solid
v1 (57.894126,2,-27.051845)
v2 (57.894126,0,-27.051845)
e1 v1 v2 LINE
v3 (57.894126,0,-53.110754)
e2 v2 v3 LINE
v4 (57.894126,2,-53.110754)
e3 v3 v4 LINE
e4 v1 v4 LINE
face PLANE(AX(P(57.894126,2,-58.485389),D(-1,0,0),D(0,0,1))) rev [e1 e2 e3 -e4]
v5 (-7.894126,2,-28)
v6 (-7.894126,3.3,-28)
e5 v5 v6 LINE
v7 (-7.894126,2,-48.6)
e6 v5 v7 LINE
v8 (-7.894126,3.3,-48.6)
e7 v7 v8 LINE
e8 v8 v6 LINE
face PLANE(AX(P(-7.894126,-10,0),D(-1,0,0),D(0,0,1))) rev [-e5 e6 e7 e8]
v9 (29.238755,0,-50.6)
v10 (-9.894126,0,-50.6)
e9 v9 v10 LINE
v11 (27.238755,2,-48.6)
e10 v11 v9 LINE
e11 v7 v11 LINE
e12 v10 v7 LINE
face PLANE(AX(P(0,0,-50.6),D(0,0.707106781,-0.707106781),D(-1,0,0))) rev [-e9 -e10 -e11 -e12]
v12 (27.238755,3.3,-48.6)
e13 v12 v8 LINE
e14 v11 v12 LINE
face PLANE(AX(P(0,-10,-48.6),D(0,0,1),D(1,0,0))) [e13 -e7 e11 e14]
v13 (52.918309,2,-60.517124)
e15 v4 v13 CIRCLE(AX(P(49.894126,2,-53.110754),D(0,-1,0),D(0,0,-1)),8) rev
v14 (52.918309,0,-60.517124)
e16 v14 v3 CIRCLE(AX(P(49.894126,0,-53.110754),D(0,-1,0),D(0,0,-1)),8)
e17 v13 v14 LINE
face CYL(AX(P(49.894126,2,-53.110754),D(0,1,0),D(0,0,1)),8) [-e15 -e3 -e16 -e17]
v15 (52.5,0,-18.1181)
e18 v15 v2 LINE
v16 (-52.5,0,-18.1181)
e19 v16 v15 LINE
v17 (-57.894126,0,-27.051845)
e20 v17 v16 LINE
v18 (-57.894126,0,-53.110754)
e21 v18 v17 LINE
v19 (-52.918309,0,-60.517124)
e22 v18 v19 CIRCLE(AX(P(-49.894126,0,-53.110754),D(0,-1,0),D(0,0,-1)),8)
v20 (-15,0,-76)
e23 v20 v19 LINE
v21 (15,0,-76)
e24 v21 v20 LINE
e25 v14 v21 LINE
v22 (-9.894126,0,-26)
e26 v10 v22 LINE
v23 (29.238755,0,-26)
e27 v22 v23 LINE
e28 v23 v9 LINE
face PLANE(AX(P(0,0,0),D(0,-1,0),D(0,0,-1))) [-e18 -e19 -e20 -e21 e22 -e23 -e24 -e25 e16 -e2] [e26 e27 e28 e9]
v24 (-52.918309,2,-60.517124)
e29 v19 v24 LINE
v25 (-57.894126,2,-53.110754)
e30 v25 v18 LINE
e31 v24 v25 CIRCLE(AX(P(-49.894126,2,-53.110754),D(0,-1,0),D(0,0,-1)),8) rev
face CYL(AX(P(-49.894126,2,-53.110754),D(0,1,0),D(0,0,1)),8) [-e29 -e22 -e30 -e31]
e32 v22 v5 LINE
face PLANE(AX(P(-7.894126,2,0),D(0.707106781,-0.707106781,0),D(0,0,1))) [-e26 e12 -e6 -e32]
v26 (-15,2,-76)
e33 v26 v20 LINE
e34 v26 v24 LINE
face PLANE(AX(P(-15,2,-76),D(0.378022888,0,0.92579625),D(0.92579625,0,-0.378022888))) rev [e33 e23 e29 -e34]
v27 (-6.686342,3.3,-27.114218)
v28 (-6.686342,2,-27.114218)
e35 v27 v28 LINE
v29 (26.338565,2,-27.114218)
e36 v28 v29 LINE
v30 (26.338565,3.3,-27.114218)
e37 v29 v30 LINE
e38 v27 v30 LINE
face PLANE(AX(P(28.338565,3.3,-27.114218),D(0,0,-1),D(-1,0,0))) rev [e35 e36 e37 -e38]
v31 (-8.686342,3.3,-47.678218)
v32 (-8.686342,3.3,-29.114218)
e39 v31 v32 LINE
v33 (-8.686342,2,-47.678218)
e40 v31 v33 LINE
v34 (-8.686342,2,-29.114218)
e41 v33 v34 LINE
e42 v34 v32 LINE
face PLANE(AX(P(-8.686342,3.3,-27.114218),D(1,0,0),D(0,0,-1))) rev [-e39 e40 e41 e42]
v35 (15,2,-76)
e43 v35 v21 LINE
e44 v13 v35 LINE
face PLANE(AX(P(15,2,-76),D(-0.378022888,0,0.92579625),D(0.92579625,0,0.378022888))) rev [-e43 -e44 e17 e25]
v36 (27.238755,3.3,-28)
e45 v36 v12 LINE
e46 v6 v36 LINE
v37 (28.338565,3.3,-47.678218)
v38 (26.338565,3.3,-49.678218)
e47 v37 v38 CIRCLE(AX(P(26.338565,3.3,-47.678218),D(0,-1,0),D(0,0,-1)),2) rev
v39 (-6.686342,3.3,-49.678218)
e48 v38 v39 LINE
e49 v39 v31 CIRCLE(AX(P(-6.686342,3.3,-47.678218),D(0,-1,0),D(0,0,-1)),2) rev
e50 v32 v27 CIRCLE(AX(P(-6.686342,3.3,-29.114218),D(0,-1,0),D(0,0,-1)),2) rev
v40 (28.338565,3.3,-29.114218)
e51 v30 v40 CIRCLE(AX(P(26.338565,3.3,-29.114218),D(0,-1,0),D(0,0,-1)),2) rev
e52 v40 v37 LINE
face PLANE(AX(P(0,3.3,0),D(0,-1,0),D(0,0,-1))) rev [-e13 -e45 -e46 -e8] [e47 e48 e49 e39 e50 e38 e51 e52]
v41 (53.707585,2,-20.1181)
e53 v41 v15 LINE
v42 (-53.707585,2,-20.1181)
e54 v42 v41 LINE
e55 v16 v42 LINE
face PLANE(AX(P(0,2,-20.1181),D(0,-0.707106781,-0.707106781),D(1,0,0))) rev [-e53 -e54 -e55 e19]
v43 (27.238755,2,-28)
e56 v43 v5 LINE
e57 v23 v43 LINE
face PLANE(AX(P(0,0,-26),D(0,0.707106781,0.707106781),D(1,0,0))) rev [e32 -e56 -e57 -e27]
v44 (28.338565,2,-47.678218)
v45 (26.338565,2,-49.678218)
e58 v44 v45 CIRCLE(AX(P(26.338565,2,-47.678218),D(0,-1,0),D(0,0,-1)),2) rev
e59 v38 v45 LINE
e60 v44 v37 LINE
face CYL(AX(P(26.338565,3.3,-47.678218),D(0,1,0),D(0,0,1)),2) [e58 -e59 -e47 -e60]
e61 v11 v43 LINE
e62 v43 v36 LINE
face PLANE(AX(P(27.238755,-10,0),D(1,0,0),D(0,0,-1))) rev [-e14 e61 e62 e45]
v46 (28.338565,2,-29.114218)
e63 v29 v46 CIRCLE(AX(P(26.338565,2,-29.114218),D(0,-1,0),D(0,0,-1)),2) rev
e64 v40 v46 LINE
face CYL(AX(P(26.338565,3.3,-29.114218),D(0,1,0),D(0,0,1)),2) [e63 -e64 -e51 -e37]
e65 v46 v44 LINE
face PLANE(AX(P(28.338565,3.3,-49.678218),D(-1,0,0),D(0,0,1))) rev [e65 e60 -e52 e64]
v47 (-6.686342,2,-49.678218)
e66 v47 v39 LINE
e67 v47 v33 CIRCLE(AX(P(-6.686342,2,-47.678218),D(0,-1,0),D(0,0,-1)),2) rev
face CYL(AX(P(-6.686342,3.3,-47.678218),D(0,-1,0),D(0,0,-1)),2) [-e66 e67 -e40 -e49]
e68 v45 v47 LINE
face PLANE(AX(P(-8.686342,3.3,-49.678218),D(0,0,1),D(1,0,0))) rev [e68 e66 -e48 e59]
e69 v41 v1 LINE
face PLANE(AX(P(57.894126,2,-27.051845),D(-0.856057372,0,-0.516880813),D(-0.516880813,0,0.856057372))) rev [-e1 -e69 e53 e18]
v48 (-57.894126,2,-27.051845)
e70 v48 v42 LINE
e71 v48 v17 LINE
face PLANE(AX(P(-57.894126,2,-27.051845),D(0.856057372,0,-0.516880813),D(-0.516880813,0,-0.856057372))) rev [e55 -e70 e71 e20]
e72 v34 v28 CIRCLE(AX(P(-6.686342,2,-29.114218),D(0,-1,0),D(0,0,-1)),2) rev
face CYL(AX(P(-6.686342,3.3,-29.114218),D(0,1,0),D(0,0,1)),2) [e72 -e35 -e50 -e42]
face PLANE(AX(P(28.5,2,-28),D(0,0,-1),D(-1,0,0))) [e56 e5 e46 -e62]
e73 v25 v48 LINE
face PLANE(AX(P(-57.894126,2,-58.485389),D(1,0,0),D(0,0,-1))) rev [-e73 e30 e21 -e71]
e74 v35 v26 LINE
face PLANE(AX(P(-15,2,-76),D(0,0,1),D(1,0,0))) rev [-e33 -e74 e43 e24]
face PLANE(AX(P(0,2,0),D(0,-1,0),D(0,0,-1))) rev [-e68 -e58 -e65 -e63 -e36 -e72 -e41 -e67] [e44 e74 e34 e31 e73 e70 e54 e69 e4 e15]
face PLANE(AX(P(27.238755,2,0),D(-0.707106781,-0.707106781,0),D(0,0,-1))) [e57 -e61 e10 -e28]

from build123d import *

# Parameters (mm, degrees)
SKETCH2_W           = 33
SKETCH2_H           = 17.000000000000007
BOSS_EXTRUDE1_DEPTH = 2
FILLET1_R           = 8
FILLET2_R           = 8
CHAMFER1_SIZE       = 2
CUT_EXTRUDE2_DEPTH  = 12
SKETCH6_W           = 1.2612446076729746
SKETCH6_H           = 17.000000000000007
BOSS_EXTRUDE3_DEPTH = 2
SKETCH8_W           = 37.024907352098374
SKETCH8_H           = 22.564000776868035
BOSS_EXTRUDE4_DEPTH = 1.3
FILLET4_R           = 2
FILLET5_R           = 2
FILLET6_R           = 2
FILLET7_R           = 2
CHAMFER2_SIZE       = 2
CHAMFER3_SIZE       = 2
CHAMFER4_SIZE       = 2
CHAMFER5_SIZE       = 2


with BuildPart() as part:
    # Sketch2 → Boss-Extrude1 (new body)
    with BuildSketch(Plane(origin=(0, 0, 0), x_dir=(1, 0, 0), z_dir=(0, 1, 0))):
        Polygon((-15.000000000000073, 76.00000000000003), (15.000000000000004, 76.00000000000003), (57.894125564998674, 58.48538895430336), (57.894125564998674, 27.05184462316343), (52.49999999999998, 18.118100444839456), (-52.50000000000002, 18.118100444839435), (-57.89412556499873, 27.051844623163408), (-57.894125564998745, 58.48538895430333), align=None)
        with Locations((11.999999999999982, 36.50000000000003)):
            Rectangle(SKETCH2_W, SKETCH2_H, mode=Mode.SUBTRACT)
    extrude(amount=BOSS_EXTRUDE1_DEPTH)

    # Fillet1
    fillet1_edges = [part.edges().sort_by_distance(p)[0] for p in [
        (57.894125564998674, 1, -58.48538895430336),
    ]]
    fillet(fillet1_edges, radius=FILLET1_R)

    # Fillet2
    fillet2_edges = [part.edges().sort_by_distance(p)[0] for p in [
        (-57.894125564998745, 1, -58.48538895430333),
    ]]
    fillet(fillet2_edges, radius=FILLET2_R)

    # Chamfer1
    chamfer1_edges = [part.edges().sort_by_distance(p)[0] for p in [
        (-2.132e-14, 2, -18.118100444839445),
    ]]
    chamfer(chamfer1_edges, length=CHAMFER1_SIZE - 0.0001)  # a hair under: the kernel refuses the full size

    # Sketch3 → Cut-Extrude2 (cut)
    with BuildSketch(Plane(origin=(0, 2, 0), x_dir=(1, 0, 0), z_dir=(0, 1, 0))):
        Polygon((-7.894125564998744, 48.60000000000001), (-7.894125564998744, 28.000000000000025), (-4.500000000000018, 28.000000000000025), (-4.500000000000018, 45.00000000000003), (-4.500000000000016, 48.60000000000002), align=None)
        Polygon((-4.500000000000018, 45.00000000000003), (27.238755392327008, 45.00000000000003), (27.238755392327008, 48.600000000000016), (-4.500000000000016, 48.60000000000002), align=None)
    extrude(amount=-CUT_EXTRUDE2_DEPTH, mode=Mode.SUBTRACT)

    # Sketch6 → Boss-Extrude3 (add)
    with BuildSketch(Plane(origin=(0, 2, 0), x_dir=(1, 0, 0), z_dir=(0, 1, 0))):
        with Locations((27.869377696163497, 36.50000000000003)):
            Rectangle(SKETCH6_W, SKETCH6_H)
    extrude(amount=-BOSS_EXTRUDE3_DEPTH)

    # Sketch8 → Boss-Extrude4 (add)
    with BuildSketch(Plane(origin=(0, 2, 0), x_dir=(1, 0, 0), z_dir=(0, 1, 0))):
        with Locations((9.826111603405227, 38.39621794248441)):
            Rectangle(SKETCH8_W, SKETCH8_H)
        Polygon((-7.894125564998744, 48.60000000000001), (27.238755392327008, 48.600000000000016), (27.238755392327008, 28.000000000000025), (-7.894125564998744, 28.000000000000025), align=None, mode=Mode.SUBTRACT)
    extrude(amount=BOSS_EXTRUDE4_DEPTH)

    # Fillet4
    fillet4_edges = [part.edges().sort_by_distance(p)[0] for p in [
        (-8.68634207264396, 2.65, -49.67821833091842),
    ]]
    fillet(fillet4_edges, radius=FILLET4_R)

    # Fillet5
    fillet5_edges = [part.edges().sort_by_distance(p)[0] for p in [
        (28.338565279454414, 2.65, -49.67821833091842),
    ]]
    fillet(fillet5_edges, radius=FILLET5_R)

    # Fillet6
    fillet6_edges = [part.edges().sort_by_distance(p)[0] for p in [
        (28.338565279454414, 2.65, -27.11421755405039),
    ]]
    fillet(fillet6_edges, radius=FILLET6_R)

    # Fillet7
    fillet7_edges = [part.edges().sort_by_distance(p)[0] for p in [
        (-8.68634207264396, 2.65, -27.11421755405039),
    ]]
    fillet(fillet7_edges, radius=FILLET7_R)

    # Chamfer2
    chamfer2_edges = [part.edges().sort_by_distance(p)[0] for p in [
        (27.238755392327008, 0, -38.30000000000002),
    ]]
    chamfer(chamfer2_edges, length=CHAMFER2_SIZE)

    # Chamfer3
    chamfer3_edges = [part.edges().sort_by_distance(p)[0] for p in [
        (10.672314913664133, 0, -28.000000000000025),
    ]]
    chamfer(chamfer3_edges, length=CHAMFER3_SIZE)

    # Chamfer4
    chamfer4_edges = [part.edges().sort_by_distance(p)[0] for p in [
        (-7.894125564998744, 0, -37.30000000000002),
    ]]
    chamfer(chamfer4_edges, length=CHAMFER4_SIZE)

    # Chamfer5
    chamfer5_edges = [part.edges().sort_by_distance(p)[0] for p in [
        (9.672314913664131, 0, -48.60000000000009),
    ]]
    chamfer(chamfer5_edges, length=CHAMFER5_SIZE)


solid = part.part
